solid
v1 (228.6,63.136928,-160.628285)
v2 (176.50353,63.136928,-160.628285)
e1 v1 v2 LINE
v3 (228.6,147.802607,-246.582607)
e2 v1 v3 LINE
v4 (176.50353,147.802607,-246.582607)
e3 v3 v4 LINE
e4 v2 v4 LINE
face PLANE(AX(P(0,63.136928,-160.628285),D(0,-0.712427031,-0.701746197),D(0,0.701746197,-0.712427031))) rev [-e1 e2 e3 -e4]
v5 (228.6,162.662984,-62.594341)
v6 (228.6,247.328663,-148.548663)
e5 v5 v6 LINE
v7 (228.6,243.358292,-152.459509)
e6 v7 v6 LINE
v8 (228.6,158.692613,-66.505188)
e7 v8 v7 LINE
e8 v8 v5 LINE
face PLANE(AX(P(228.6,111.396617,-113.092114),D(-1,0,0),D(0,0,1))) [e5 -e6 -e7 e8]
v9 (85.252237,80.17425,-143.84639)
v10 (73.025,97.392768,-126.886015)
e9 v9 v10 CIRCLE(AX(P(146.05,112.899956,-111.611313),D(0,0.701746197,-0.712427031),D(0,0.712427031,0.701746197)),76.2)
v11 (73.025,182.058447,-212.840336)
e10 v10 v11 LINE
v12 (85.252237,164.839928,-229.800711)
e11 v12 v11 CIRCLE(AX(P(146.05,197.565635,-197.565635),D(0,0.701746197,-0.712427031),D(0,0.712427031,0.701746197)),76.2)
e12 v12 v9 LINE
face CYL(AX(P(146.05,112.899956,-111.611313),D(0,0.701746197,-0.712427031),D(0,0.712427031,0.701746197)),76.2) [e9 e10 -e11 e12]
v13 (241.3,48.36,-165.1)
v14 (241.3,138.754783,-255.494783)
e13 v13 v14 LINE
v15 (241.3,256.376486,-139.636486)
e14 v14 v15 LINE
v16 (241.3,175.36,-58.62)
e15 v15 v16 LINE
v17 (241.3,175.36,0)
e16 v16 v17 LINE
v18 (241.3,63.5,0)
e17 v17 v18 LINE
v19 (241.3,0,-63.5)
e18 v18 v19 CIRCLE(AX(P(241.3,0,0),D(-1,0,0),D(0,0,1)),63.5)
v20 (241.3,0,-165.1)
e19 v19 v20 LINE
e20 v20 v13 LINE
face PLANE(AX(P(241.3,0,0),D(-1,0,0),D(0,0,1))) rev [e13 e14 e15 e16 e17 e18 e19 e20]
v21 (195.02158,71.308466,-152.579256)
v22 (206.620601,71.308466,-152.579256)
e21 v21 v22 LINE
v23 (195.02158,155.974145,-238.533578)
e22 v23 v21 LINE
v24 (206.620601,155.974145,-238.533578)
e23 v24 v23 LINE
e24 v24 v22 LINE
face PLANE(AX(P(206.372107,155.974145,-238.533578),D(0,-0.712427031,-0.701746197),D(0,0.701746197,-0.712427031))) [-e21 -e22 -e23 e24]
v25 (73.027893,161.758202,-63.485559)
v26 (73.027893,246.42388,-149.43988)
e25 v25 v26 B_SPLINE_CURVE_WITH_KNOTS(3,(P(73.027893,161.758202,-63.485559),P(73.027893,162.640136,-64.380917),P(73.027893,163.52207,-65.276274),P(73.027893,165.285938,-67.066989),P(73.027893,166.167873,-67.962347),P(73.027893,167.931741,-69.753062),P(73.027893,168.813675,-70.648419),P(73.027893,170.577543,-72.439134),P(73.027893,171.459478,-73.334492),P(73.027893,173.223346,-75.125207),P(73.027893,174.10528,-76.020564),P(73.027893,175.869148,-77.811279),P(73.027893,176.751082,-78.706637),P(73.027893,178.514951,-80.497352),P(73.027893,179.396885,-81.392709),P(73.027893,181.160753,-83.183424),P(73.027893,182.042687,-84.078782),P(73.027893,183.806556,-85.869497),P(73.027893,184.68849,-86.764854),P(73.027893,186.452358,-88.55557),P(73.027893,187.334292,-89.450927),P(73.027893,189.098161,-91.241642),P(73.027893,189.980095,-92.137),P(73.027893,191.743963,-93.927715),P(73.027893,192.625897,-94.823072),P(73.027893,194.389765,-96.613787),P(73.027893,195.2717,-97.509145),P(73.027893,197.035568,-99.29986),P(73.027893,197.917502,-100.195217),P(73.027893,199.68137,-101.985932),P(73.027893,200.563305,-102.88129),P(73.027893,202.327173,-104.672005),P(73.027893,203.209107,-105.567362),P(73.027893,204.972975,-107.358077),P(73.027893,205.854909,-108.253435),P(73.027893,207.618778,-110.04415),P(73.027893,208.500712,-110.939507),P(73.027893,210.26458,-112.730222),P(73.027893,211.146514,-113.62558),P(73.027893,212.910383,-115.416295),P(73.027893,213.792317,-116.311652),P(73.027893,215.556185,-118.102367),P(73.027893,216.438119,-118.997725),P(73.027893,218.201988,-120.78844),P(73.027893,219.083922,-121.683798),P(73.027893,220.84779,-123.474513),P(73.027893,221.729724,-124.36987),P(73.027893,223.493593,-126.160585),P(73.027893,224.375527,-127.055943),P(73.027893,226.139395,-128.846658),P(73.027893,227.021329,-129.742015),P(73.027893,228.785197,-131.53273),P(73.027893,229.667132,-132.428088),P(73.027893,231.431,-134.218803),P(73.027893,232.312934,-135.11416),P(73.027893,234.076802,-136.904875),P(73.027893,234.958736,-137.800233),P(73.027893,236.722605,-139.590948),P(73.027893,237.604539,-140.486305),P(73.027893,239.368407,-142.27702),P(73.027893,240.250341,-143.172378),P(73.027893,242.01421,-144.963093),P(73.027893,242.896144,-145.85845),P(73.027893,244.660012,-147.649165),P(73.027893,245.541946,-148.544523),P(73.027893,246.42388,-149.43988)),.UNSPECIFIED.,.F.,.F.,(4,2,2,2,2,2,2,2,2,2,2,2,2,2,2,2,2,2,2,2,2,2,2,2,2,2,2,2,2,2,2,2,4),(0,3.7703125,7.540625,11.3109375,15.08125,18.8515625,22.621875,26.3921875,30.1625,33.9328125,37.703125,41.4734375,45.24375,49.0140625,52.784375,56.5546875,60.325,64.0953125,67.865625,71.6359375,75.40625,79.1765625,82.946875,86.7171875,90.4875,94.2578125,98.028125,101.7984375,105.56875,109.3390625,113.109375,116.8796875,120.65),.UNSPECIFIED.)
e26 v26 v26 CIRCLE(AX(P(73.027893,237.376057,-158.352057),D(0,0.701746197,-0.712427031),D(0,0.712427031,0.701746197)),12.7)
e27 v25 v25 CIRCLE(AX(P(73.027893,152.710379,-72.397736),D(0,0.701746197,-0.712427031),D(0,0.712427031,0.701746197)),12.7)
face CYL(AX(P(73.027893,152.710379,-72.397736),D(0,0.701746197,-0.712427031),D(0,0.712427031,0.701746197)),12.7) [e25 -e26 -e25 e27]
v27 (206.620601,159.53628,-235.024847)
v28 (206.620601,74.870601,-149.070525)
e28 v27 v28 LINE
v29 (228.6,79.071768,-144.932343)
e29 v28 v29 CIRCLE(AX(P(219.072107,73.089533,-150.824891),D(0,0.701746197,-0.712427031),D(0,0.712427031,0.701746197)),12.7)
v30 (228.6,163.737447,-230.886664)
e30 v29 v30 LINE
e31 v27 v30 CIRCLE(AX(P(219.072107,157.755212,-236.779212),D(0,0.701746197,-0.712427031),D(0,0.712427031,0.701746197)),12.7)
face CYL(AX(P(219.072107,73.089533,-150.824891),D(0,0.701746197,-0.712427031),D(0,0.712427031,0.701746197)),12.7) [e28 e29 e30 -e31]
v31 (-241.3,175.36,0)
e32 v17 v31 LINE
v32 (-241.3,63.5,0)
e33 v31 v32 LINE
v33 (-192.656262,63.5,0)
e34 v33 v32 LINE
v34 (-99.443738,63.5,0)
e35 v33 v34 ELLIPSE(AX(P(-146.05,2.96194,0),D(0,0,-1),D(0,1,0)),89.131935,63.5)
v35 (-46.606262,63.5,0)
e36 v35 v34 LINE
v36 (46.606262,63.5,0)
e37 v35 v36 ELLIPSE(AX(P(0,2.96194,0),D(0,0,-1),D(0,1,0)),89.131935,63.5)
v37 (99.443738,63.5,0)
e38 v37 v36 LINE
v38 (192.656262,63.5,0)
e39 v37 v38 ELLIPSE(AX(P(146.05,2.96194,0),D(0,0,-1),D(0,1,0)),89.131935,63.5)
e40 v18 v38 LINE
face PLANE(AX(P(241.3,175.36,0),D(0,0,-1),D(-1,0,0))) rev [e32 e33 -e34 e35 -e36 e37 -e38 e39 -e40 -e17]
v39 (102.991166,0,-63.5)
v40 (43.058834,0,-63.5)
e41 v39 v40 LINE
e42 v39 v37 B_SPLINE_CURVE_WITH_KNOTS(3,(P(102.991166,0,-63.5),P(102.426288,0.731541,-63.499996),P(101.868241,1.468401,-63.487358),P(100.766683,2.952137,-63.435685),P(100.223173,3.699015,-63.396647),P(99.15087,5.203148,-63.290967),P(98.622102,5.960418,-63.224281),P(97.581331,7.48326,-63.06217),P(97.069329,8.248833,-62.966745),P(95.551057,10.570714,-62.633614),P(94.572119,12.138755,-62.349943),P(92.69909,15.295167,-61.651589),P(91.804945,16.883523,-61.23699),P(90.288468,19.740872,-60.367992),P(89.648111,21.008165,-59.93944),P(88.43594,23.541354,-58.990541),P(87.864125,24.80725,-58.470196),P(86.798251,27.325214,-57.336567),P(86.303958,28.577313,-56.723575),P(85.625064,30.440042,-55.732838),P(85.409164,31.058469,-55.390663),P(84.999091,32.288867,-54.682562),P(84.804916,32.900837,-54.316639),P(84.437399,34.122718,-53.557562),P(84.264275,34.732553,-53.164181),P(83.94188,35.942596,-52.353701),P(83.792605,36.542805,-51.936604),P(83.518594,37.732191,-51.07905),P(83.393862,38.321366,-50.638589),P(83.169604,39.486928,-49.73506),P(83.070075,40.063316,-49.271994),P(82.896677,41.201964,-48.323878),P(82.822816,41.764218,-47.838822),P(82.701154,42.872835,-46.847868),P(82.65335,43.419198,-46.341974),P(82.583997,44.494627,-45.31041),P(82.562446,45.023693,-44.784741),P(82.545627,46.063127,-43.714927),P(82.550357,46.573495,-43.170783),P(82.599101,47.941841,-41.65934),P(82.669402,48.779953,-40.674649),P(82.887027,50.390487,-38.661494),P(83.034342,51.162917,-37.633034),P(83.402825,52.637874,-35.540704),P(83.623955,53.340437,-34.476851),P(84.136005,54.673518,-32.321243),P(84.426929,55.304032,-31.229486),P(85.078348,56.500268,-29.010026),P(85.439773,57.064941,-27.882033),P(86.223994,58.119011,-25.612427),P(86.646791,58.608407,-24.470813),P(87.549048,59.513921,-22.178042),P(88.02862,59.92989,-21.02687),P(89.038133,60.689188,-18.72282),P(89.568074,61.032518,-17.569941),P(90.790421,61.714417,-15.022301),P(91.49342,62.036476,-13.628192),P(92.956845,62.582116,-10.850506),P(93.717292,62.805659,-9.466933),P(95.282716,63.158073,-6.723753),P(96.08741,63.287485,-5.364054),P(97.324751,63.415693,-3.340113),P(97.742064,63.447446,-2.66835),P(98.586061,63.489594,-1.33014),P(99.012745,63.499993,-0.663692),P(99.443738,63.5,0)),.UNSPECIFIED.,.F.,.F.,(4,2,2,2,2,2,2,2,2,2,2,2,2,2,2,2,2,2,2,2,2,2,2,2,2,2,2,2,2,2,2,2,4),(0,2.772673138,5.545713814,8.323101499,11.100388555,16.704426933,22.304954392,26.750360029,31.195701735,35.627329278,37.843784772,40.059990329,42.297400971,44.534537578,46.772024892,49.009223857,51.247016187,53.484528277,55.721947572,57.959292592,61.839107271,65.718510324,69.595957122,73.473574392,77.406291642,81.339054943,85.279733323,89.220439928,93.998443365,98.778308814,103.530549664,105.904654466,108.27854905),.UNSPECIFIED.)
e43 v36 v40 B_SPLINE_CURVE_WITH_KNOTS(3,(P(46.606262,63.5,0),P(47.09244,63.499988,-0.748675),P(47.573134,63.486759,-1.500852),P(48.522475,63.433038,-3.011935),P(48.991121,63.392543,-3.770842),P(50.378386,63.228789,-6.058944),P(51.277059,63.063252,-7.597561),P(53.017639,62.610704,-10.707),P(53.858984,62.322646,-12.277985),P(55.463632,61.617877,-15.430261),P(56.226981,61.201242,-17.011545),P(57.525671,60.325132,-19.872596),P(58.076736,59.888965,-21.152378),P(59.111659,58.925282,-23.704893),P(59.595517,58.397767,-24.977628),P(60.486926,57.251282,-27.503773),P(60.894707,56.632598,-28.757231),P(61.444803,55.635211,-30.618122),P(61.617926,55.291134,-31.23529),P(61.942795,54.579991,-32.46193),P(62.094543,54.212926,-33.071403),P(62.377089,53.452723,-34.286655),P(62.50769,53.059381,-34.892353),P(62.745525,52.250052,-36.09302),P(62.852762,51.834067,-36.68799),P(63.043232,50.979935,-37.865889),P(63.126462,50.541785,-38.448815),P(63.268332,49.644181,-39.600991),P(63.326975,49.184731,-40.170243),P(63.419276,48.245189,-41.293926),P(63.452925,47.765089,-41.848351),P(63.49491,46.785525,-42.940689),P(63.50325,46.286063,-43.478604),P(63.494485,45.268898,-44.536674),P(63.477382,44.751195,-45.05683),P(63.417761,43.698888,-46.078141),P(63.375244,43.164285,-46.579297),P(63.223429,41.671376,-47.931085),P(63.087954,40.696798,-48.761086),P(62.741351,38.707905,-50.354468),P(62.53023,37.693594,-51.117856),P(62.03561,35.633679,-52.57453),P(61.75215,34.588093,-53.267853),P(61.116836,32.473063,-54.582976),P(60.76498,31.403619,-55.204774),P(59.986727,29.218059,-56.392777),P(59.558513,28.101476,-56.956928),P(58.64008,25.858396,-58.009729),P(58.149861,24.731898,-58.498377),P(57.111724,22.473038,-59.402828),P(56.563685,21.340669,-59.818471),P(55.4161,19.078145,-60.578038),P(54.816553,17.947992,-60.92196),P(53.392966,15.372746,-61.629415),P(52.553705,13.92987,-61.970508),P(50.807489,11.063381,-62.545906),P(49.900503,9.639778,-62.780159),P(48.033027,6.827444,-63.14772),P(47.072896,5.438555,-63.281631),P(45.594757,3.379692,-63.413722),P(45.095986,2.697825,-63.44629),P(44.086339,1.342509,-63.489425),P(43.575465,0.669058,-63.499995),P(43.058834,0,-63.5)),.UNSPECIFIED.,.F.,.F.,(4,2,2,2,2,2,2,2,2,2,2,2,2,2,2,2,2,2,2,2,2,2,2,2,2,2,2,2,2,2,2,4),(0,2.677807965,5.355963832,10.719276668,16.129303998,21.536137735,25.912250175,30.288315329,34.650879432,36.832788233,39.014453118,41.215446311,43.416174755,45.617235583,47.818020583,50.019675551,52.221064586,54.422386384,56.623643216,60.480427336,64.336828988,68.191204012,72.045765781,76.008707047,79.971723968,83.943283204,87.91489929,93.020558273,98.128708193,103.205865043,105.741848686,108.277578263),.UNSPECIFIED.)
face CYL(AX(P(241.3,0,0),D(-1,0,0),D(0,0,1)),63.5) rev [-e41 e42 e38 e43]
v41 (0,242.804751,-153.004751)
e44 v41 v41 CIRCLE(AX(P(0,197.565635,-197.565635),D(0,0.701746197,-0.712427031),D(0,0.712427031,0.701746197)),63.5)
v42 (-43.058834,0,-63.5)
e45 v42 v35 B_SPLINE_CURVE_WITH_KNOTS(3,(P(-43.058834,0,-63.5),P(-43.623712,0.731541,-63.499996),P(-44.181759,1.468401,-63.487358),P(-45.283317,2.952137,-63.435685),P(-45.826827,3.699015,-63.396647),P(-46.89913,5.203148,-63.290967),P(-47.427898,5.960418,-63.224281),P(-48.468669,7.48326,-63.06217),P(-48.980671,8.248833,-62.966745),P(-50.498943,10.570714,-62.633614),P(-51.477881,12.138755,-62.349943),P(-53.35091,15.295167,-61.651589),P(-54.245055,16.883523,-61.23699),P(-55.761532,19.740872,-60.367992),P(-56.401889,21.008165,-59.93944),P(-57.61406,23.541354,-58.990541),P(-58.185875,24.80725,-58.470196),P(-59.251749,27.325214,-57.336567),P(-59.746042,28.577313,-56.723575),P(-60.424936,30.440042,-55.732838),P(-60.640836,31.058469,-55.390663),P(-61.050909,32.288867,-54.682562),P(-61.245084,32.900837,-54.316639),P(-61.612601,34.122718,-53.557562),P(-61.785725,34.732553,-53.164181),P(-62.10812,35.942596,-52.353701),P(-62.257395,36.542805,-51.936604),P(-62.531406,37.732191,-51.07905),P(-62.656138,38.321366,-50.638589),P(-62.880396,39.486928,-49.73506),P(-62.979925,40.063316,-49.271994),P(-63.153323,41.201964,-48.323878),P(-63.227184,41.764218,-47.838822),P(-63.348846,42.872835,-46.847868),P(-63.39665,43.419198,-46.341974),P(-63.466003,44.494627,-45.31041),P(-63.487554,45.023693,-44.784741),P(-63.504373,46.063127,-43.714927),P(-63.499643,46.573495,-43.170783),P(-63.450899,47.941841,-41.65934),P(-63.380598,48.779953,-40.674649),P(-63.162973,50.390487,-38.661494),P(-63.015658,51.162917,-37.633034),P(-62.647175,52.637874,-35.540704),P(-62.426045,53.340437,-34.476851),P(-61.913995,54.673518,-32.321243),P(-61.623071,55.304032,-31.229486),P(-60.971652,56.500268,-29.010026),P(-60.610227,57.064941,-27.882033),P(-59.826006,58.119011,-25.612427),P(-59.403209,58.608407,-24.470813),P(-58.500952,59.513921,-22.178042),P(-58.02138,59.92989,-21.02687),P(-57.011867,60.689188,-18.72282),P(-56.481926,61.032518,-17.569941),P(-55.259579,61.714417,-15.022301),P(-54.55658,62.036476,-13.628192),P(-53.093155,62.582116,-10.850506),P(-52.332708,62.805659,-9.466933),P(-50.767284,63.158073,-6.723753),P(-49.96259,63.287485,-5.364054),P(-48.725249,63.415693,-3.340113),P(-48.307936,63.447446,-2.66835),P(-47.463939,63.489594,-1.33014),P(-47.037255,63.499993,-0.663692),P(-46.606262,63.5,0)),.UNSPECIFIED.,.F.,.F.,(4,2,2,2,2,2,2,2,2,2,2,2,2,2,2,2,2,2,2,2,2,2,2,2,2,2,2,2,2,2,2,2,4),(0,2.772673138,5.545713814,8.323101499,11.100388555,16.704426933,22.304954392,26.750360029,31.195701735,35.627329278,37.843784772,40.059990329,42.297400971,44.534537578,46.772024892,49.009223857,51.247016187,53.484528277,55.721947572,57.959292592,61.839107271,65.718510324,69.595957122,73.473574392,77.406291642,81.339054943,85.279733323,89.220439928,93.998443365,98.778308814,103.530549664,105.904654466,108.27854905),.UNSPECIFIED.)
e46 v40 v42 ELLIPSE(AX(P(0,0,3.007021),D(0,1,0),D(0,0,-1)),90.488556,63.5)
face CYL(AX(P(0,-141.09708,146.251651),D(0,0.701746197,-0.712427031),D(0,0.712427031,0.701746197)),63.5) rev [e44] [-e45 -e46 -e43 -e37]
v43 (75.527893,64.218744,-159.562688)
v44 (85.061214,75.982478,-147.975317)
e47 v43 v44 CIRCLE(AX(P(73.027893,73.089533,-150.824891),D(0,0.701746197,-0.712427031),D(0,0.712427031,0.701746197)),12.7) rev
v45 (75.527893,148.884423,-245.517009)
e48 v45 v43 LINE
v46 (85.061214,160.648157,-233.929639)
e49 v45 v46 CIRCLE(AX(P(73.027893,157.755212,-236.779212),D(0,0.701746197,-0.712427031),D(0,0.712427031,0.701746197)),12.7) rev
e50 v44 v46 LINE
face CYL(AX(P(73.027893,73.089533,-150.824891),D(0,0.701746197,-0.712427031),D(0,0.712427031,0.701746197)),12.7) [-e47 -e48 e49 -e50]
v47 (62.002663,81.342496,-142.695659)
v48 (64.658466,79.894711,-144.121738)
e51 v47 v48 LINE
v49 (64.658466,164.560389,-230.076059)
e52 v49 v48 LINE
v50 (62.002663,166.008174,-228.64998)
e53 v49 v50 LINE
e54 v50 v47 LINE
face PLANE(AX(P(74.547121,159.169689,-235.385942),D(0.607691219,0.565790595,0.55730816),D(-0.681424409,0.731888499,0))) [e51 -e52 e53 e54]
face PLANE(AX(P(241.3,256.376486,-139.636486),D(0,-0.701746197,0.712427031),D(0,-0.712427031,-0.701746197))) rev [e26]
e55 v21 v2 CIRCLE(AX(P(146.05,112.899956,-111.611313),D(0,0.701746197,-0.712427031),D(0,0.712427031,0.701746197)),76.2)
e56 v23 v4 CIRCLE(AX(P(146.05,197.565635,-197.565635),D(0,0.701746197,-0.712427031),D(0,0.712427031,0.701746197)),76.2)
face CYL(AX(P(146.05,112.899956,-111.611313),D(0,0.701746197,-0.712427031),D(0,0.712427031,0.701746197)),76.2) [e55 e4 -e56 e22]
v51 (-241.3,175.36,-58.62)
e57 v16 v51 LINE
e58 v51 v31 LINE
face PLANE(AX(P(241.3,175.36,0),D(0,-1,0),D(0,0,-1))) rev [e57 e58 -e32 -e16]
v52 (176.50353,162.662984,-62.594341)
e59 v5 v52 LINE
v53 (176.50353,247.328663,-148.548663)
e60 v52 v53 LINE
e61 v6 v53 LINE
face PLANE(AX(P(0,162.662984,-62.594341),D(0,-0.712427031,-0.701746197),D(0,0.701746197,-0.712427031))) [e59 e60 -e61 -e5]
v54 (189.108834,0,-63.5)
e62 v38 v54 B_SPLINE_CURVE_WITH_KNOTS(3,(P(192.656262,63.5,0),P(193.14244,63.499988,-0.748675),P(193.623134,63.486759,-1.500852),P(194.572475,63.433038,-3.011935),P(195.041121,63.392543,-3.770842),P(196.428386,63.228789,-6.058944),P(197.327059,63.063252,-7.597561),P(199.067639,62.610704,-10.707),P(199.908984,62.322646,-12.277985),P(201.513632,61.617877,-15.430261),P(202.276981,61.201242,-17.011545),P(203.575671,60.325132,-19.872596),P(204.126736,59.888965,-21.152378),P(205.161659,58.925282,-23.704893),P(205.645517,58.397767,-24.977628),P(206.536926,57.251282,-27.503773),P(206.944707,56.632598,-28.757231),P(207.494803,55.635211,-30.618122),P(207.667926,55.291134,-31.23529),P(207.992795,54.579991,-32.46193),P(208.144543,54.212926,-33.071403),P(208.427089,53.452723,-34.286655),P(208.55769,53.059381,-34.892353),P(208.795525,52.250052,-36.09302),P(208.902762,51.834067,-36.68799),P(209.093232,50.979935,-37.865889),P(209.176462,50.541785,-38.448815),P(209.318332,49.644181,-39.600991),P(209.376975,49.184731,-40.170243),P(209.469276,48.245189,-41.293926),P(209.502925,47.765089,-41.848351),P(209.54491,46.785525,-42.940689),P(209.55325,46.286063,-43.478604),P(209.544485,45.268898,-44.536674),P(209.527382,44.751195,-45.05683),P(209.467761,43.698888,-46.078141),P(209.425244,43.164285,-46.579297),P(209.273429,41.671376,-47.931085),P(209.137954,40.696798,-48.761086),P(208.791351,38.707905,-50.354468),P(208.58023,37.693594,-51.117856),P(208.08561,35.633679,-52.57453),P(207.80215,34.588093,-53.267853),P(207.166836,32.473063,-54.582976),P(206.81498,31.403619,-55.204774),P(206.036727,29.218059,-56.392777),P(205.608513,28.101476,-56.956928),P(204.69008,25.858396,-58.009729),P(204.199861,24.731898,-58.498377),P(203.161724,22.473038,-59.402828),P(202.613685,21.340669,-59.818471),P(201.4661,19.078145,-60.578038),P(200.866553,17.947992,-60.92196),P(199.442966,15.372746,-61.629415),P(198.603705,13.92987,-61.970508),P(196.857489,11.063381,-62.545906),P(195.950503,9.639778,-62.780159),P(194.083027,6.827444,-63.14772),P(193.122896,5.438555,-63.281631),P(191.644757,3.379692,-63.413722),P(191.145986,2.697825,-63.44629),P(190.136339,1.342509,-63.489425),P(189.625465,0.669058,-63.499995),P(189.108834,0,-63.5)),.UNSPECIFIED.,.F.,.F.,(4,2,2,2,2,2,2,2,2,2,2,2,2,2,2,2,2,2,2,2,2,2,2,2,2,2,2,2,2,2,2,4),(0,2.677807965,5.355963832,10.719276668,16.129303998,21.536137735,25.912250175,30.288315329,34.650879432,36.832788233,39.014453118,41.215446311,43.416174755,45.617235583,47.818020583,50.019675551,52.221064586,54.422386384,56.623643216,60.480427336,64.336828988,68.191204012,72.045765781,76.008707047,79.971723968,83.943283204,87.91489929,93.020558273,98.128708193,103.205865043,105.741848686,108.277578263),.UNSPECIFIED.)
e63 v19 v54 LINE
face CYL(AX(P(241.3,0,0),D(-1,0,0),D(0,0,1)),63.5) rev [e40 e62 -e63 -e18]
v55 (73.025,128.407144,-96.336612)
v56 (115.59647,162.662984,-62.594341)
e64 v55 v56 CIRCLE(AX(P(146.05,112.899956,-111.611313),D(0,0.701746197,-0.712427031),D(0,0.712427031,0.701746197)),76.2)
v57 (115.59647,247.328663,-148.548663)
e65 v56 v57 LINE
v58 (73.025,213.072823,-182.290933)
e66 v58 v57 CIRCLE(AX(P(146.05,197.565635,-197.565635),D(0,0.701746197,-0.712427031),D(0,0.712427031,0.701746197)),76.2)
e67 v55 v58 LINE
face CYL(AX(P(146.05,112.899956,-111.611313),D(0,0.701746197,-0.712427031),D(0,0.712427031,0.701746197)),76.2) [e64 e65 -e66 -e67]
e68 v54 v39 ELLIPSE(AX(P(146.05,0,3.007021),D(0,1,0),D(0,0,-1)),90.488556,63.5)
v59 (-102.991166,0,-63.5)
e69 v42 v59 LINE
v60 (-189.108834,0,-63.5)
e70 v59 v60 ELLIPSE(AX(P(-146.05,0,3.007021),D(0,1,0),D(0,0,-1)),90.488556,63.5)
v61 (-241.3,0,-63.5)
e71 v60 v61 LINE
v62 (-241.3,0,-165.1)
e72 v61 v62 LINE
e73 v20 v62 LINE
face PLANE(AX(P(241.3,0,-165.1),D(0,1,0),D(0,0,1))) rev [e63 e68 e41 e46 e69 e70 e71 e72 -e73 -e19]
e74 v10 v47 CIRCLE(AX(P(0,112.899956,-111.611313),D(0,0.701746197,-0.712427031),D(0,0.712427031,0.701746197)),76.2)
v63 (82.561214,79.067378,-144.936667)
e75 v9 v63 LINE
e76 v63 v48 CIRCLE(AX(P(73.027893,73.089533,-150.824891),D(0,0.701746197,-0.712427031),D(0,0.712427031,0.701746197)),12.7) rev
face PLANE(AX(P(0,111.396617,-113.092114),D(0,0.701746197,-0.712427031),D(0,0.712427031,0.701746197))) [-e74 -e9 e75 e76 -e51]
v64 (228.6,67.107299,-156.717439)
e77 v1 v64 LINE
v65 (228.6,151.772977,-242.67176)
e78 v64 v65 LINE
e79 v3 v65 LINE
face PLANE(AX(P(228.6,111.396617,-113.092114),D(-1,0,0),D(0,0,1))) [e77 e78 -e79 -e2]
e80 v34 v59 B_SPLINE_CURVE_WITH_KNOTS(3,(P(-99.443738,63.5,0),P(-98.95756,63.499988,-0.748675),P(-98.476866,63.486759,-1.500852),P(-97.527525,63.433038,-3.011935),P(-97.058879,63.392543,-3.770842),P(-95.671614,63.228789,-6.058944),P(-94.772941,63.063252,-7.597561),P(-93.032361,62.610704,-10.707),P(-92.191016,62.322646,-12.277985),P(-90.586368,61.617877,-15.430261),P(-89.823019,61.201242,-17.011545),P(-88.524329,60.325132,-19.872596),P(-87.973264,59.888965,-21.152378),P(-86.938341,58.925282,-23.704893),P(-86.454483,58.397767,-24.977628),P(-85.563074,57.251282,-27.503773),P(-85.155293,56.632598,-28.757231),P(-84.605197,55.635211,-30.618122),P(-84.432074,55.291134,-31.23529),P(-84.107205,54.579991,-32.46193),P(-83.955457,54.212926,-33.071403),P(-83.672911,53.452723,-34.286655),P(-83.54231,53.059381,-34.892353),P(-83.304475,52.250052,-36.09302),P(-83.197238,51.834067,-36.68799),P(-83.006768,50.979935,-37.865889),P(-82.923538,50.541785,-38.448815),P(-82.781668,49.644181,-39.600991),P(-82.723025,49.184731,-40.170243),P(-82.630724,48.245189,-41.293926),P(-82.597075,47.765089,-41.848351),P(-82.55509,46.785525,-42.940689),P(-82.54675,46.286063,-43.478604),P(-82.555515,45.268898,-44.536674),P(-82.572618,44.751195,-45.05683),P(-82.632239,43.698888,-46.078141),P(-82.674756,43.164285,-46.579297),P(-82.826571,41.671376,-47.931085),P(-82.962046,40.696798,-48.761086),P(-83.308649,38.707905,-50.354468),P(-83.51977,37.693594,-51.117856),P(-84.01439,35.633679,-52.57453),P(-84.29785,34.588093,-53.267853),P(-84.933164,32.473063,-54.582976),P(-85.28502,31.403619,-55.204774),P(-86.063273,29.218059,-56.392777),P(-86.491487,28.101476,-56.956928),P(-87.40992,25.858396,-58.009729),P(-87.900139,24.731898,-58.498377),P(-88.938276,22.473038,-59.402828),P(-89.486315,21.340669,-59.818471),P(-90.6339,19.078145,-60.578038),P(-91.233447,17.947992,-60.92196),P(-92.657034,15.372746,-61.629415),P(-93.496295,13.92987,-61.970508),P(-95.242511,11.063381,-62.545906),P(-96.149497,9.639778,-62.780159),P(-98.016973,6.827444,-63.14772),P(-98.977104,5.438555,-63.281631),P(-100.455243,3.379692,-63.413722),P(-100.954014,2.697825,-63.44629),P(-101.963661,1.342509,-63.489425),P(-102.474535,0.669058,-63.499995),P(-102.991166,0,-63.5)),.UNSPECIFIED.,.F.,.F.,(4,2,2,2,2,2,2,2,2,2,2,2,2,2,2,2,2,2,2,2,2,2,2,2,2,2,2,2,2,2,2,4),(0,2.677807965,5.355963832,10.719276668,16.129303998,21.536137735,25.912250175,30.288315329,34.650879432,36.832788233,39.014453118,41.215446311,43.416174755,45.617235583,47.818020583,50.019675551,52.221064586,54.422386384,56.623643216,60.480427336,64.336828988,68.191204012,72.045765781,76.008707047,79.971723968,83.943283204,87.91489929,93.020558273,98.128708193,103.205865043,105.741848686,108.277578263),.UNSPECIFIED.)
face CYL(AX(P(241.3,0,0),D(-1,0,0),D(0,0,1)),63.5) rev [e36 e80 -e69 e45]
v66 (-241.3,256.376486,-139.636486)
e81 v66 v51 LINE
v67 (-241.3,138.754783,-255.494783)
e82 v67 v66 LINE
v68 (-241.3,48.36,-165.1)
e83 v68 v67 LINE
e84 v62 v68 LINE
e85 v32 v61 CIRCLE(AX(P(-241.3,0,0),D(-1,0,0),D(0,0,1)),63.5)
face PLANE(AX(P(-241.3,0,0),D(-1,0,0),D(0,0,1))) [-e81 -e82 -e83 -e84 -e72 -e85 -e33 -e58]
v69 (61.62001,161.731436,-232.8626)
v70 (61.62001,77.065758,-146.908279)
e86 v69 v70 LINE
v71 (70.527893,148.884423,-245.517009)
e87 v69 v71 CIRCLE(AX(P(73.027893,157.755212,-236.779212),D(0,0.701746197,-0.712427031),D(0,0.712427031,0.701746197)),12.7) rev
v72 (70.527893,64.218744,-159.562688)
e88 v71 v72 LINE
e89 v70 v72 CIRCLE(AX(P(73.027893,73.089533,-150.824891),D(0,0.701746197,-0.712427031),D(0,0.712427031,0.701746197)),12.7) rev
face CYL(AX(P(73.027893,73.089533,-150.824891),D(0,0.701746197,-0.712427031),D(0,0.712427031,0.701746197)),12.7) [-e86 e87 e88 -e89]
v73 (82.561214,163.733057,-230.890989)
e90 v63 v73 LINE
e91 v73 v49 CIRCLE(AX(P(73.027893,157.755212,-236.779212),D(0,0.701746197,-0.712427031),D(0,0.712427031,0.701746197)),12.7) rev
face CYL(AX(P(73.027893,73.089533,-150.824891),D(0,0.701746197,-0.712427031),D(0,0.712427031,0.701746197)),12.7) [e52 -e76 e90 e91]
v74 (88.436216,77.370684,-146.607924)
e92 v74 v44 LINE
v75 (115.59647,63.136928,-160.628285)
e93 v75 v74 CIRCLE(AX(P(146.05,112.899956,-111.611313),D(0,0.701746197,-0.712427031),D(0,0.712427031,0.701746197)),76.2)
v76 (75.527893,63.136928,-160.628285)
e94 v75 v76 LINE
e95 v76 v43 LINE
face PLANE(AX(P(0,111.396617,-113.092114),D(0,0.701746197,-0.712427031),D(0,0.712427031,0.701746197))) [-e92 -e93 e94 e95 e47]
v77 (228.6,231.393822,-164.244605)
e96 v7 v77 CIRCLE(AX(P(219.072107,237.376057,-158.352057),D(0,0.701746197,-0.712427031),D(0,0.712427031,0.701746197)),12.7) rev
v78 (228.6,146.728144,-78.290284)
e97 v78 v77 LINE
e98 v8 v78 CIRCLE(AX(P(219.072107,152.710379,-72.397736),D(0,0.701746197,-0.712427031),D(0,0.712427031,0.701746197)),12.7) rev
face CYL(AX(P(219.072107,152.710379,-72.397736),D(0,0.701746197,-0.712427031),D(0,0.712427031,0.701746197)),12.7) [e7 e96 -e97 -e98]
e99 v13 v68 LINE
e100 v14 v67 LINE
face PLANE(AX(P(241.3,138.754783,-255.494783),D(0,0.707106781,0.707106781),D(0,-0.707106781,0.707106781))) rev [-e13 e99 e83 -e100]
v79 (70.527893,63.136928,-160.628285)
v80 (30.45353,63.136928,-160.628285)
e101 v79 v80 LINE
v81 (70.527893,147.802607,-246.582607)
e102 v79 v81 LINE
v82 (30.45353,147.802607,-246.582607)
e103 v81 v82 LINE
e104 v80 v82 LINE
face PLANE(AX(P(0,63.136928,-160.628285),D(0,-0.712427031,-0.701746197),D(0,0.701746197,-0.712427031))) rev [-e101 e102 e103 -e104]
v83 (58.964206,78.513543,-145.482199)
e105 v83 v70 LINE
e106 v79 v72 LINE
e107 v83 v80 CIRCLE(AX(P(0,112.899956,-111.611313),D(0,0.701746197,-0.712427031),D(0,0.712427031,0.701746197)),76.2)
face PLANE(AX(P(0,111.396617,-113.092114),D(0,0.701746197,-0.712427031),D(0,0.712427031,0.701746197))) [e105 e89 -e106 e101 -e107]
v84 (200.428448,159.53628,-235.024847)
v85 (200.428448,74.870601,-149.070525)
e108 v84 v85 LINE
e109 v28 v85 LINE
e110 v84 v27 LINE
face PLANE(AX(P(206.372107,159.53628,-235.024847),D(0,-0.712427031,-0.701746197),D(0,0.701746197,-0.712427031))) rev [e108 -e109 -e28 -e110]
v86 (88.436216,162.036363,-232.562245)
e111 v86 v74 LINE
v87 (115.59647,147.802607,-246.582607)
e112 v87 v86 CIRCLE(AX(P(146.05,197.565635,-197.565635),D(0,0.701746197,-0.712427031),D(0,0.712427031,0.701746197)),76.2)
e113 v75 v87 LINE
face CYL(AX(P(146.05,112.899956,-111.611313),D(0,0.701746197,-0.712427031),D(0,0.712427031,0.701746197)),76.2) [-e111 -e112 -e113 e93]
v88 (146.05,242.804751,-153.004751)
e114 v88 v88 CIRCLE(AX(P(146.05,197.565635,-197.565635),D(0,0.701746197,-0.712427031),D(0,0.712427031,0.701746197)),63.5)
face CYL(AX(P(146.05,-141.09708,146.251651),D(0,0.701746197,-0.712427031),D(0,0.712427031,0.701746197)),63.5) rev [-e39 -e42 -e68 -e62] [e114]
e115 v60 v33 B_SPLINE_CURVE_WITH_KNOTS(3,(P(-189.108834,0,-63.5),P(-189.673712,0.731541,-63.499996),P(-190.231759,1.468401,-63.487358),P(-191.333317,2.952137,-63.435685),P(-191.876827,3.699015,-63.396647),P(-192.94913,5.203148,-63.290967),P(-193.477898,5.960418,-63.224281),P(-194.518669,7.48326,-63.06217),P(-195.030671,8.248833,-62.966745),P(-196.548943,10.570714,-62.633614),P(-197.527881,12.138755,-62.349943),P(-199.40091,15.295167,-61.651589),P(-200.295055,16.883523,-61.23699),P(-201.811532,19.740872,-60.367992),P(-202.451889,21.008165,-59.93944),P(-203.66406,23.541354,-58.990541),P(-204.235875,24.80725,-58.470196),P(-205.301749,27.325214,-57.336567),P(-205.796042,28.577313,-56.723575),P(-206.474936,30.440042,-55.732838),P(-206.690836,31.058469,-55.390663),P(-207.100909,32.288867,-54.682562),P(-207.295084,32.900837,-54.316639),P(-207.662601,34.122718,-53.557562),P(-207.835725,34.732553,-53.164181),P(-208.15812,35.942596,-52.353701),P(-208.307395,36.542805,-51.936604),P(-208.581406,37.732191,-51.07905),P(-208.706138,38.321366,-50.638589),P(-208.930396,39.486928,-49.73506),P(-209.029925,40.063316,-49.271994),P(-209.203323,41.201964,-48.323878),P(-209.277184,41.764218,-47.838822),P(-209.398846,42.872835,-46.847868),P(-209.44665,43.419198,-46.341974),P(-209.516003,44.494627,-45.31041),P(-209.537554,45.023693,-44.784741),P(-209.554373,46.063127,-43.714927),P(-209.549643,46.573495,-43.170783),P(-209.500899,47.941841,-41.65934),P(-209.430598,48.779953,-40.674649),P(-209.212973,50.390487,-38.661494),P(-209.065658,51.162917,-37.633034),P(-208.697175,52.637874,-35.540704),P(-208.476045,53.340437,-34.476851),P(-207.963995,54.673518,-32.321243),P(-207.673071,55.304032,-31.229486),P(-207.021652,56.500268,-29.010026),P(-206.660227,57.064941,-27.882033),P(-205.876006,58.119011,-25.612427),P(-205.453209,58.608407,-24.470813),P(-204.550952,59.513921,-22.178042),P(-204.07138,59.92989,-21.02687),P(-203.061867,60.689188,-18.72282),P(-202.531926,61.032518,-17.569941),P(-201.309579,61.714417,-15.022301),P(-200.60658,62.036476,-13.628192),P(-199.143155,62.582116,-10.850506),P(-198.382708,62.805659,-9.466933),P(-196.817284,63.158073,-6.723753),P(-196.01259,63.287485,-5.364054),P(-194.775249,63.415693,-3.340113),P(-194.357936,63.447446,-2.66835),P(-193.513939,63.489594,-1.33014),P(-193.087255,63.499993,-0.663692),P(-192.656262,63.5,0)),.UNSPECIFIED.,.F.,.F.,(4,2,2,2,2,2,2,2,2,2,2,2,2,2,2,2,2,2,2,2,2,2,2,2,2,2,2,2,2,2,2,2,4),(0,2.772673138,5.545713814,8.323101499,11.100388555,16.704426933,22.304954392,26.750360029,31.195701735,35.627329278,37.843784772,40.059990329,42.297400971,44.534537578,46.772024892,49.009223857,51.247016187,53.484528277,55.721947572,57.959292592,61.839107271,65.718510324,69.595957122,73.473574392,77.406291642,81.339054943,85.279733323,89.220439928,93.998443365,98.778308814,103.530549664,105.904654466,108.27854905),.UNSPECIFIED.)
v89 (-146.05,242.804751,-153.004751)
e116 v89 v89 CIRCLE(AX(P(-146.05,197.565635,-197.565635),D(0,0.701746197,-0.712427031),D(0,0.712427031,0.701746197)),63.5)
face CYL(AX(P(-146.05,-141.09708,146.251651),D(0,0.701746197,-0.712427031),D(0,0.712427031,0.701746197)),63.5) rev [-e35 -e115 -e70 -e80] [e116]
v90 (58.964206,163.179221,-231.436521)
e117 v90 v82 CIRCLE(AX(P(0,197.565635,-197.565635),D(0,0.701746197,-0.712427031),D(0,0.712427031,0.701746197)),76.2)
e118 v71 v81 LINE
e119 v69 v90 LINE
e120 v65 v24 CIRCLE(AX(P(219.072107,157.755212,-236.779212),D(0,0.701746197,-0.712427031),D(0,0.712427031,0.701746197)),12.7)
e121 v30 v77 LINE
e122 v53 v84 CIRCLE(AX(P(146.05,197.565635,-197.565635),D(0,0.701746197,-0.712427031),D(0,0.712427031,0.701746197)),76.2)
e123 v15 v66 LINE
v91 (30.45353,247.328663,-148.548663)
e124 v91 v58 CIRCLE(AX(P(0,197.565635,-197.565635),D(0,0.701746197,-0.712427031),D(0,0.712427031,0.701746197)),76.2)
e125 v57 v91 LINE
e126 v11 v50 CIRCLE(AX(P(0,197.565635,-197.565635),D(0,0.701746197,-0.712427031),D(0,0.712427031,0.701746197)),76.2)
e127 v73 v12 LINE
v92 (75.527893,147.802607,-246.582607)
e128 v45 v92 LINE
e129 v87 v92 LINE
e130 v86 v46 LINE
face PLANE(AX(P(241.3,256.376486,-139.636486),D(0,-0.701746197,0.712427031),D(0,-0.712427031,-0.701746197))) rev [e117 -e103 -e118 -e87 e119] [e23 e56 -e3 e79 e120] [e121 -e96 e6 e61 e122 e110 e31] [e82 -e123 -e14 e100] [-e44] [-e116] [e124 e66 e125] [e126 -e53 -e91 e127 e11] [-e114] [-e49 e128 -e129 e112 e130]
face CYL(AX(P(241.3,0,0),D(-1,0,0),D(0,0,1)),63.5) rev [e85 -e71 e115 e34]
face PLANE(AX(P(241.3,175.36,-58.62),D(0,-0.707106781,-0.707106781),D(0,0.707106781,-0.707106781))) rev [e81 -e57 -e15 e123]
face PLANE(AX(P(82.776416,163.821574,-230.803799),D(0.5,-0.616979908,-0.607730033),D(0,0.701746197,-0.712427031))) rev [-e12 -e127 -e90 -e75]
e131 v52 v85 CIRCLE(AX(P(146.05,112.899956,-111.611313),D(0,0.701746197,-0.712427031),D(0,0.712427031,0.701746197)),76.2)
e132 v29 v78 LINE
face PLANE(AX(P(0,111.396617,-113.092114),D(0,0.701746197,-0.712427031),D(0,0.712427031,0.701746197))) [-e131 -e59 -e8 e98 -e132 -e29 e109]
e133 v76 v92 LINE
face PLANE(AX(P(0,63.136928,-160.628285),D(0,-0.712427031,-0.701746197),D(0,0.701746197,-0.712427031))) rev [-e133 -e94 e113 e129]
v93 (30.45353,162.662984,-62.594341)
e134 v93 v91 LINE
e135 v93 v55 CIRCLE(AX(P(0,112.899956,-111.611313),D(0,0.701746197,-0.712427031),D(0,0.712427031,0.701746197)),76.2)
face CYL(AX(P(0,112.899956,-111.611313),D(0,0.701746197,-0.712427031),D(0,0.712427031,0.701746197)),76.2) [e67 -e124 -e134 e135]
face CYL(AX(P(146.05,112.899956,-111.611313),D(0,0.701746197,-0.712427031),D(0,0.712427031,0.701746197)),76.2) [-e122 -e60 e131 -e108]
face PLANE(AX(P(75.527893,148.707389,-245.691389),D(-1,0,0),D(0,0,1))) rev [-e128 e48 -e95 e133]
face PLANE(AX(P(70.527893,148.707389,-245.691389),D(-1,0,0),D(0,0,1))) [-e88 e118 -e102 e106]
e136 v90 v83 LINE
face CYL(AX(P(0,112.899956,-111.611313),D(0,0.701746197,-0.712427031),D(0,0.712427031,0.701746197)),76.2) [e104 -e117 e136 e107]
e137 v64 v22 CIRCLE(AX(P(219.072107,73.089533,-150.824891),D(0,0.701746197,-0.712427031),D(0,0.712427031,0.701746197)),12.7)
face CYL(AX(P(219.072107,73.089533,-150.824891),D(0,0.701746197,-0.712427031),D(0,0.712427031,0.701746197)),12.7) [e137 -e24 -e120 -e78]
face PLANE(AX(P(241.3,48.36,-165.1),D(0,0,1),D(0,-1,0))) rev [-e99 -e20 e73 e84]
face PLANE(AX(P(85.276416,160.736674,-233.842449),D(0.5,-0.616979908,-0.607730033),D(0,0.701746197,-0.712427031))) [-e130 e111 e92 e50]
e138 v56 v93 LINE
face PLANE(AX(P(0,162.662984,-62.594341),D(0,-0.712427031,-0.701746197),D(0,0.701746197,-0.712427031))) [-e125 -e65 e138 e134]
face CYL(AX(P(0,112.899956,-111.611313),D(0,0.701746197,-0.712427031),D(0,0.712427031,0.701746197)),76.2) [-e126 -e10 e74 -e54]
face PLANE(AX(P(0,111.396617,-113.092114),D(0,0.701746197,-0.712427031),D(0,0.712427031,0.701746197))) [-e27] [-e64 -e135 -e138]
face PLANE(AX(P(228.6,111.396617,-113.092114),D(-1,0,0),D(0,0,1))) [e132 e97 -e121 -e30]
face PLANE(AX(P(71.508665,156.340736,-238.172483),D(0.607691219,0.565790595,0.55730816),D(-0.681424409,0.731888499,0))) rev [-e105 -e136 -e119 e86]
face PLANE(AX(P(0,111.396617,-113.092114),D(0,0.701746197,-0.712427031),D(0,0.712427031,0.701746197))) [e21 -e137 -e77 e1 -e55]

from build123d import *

# Parameters (mm, degrees)
BOSS_EXTRUDE1_DEPTH = 241.3
SKETCH2_R           = 63.5
CUT_EXTRUDE1_DEPTH  = 482.6
SKETCH4_R           = 12.7
CUT_EXTRUDE3_DEPTH  = 120.65
RIB1_START          = -120.65
RIB1_DEPTH          = 120.65
RIB2_REACH          = 371.169
RIB3_REACH          = 371.169
SKETCH7_WALLS_W     = 749.266761297
SKETCH7_WALLS_H     = 5


# Read off the part's stored shape, not the designer's step: Rib1
with BuildPart() as part:
    # Sketch1 → Boss-Extrude1 (new, symmetric)
    with BuildSketch(Plane(origin=(0, 0, 0), x_dir=(0, 0, -1), z_dir=(1, 0, 0))):
        with BuildLine():
            Line((0, 175.36), (58.62, 175.36))
            Line((58.62, 175.36), (139.636486112, 256.376486112))
            Line((139.636486112, 256.376486112), (255.494783215, 138.754783215))
            Line((255.494783215, 138.754783215), (165.1, 48.36))
            Line((165.1, 48.36), (165.1, 0))
            Line((165.1, 0), (63.5, 0))
            ThreePointArc((63.5, 0), (44.901280605, 44.901280605), (0, 63.5))
            Line((0, 63.5), (0, 175.36))
        make_face()
    extrude(amount=BOSS_EXTRUDE1_DEPTH, both=True)

    # Sketch2 → Cut-Extrude1 (cut)
    with BuildSketch(Plane(origin=(0, 196.062295457, -199.046435538), x_dir=(-1, 0, 0), z_dir=(0, 0.7017461968633759, -0.7124270314830763))):
        with Locations(Location((-146.05, 2.11016587, 0), (0, 0, 90))):
            Circle(SKETCH2_R)
        with Locations(Location((0, 2.11016587, 0), (0, 0, 90))):
            Circle(SKETCH2_R)
        with Locations(Location((146.05, 2.11016587, 0), (0, 0, 90))):
            Circle(SKETCH2_R)
    extrude(amount=-CUT_EXTRUDE1_DEPTH, mode=Mode.SUBTRACT)

    # Sketch4 → Cut-Extrude3 (cut)
    # profile 1 of 3: a face of its own
    with BuildSketch(Plane(origin=(0, 196.062295457, -199.046435538), x_dir=(-1, 0, 0), z_dir=(0, 0.7017461968632962, -0.7124270314831548))):
        with BuildLine():
            Line((-228.6, -62.166812966), (-228.6, -67.73983413))
            Line((-228.6, -67.73983413), (-176.503530173, -67.73983413))
            ThreePointArc((-176.503530173, -67.73983413), (-222.25, 2.11016587), (-176.503530173, 71.96016587))
            Line((-176.503530173, 71.96016587), (-228.6, 71.96016587))
            Line((-228.6, 71.96016587), (-228.6, 66.387144707))
            ThreePointArc((-228.6, 66.387144707), (-214.584025044, 69.870701255), (-206.372106927, 57.99016587))
            ThreePointArc((-206.372106927, 57.99016587), (-214.584025044, 46.109630486), (-228.6, 49.593187034))
            Line((-228.6, 49.593187034), (-228.6, -45.372855293))
            ThreePointArc((-228.6, -45.372855293), (-214.584025044, -41.889298745), (-206.372106927, -53.76983413))
            ThreePointArc((-206.372106927, -53.76983413), (-214.584025044, -65.650369514), (-228.6, -62.166812966))
        make_face()
    # profile 2 of 3: a face of its own
    with BuildSketch(Plane(origin=(0, 196.062295457, -199.046435538), x_dir=(-1, 0, 0), z_dir=(0, 0.7017461968632962, -0.7124270314831548))):
        with BuildLine():
            Line((-30.453530173, 71.96016587), (-115.596469827, 71.96016587))
            ThreePointArc((-115.596469827, 71.96016587), (-88.997809808, 52.622417793), (-73.025, 23.876869227))
            ThreePointArc((-73.025, 23.876869227), (-57.052190192, 52.622417793), (-30.453530173, 71.96016587))
        make_face()
        with Locations(Location((-73.027893073, 57.99016587, 0), (0, 0, 90))):
            Circle(SKETCH4_R, mode=Mode.SUBTRACT)
    # profile 3 of 3: a face of its own
    with BuildSketch(Plane(origin=(0, 196.062295457, -199.046435538), x_dir=(-1, 0, 0), z_dir=(0, 0.7017461968632962, -0.7124270314831548))):
        with BuildLine():
            ThreePointArc((-73.025, -19.656537486), (-88.997809808, -48.402086052), (-115.596469827, -67.73983413))
            Line((-115.596469827, -67.73983413), (-30.453530173, -67.73983413))
            ThreePointArc((-30.453530173, -67.73983413), (-57.052190192, -48.402086052), (-73.025, -19.656537486))
        make_face()
        with Locations(Location((-73.027893073, -53.76983413, 0), (0, 0, 90))):
            Circle(SKETCH4_R, mode=Mode.SUBTRACT)
    extrude(amount=-CUT_EXTRUDE3_DEPTH, mode=Mode.SUBTRACT)

    # Rib1 outline → Rib1 (add)
    with BuildSketch(Plane(origin=(0, 196.062295457, -199.046435538), x_dir=(-1, 0, 0), z_dir=(0, 0.7017461968632962, -0.7124270314831548)).offset(RIB1_START)):
        with BuildLine():
            ThreePointArc((-85.252237114, -43.825354461), (-86.81154021, -45.819416661), (-88.436216043, -47.760586061))
            Line((-88.436216043, -47.760586061), (-85.061213526, -49.709144673))
            ThreePointArc((-85.061213526, -49.709144673), (-84.026415701, -47.41983413), (-82.561213527, -45.379017654))
            Line((-82.561213527, -45.379017654), (-85.252237114, -43.825354461))
        make_face()
        with BuildLine():
            ThreePointArc((-70.527893073, -66.221340063), (-73.027893073, -66.46983413), (-75.527893073, -66.221340063))
            Line((-75.527893073, -66.221340063), (-75.527893073, -67.73983413))
            Line((-75.527893073, -67.73983413), (-70.527893073, -67.73983413))
            Line((-70.527893073, -67.73983413), (-70.527893073, -66.221340063))
        make_face()
    extrude(amount=RIB1_DEPTH)

    # Sketch6 walls → Rib2 (add, up to next)
    with BuildSketch(Plane(origin=(0, 196.062295457, -199.046435538), x_dir=(-1, 0, 0), z_dir=(0, 0.7017461968632962, -0.7124270314831548)), mode=Mode.PRIVATE) as rib2_sk1:
        Polygon((-365.486871932, -280.7035923), (235.169541879, 178.910932933), (232.131085785, 182.881799912), (-368.525328026, -276.732725322), align=None)
    rib2_tool1 = extrude(rib2_sk1.sketch, amount=-RIB2_REACH, mode=Mode.PRIVATE) - part.part
    add(rib2_tool1.solids().sort_by_distance((66.677893073, 161.216850874, -233.369470927))[0])

    # Sketch7 walls → Rib3 (add, up to next)
    with BuildSketch(Plane(origin=(0, 196.062295457, -199.046435538), x_dir=(-1, 0, 0), z_dir=(0, 0.7017461968632962, -0.7124270314831548)), mode=Mode.PRIVATE) as rib3_sk1:
        with Locations((-201.90751874, -53.76983413)):
            Rectangle(SKETCH7_WALLS_W, SKETCH7_WALLS_H)
    rib3_tool1 = extrude(rib3_sk1.sketch, amount=-RIB3_REACH, mode=Mode.PRIVATE) - part.part
    add(rib3_tool1.solids().sort_by_distance((201.907518739, 157.755212144, -236.779212144))[0])


solid = part.part
